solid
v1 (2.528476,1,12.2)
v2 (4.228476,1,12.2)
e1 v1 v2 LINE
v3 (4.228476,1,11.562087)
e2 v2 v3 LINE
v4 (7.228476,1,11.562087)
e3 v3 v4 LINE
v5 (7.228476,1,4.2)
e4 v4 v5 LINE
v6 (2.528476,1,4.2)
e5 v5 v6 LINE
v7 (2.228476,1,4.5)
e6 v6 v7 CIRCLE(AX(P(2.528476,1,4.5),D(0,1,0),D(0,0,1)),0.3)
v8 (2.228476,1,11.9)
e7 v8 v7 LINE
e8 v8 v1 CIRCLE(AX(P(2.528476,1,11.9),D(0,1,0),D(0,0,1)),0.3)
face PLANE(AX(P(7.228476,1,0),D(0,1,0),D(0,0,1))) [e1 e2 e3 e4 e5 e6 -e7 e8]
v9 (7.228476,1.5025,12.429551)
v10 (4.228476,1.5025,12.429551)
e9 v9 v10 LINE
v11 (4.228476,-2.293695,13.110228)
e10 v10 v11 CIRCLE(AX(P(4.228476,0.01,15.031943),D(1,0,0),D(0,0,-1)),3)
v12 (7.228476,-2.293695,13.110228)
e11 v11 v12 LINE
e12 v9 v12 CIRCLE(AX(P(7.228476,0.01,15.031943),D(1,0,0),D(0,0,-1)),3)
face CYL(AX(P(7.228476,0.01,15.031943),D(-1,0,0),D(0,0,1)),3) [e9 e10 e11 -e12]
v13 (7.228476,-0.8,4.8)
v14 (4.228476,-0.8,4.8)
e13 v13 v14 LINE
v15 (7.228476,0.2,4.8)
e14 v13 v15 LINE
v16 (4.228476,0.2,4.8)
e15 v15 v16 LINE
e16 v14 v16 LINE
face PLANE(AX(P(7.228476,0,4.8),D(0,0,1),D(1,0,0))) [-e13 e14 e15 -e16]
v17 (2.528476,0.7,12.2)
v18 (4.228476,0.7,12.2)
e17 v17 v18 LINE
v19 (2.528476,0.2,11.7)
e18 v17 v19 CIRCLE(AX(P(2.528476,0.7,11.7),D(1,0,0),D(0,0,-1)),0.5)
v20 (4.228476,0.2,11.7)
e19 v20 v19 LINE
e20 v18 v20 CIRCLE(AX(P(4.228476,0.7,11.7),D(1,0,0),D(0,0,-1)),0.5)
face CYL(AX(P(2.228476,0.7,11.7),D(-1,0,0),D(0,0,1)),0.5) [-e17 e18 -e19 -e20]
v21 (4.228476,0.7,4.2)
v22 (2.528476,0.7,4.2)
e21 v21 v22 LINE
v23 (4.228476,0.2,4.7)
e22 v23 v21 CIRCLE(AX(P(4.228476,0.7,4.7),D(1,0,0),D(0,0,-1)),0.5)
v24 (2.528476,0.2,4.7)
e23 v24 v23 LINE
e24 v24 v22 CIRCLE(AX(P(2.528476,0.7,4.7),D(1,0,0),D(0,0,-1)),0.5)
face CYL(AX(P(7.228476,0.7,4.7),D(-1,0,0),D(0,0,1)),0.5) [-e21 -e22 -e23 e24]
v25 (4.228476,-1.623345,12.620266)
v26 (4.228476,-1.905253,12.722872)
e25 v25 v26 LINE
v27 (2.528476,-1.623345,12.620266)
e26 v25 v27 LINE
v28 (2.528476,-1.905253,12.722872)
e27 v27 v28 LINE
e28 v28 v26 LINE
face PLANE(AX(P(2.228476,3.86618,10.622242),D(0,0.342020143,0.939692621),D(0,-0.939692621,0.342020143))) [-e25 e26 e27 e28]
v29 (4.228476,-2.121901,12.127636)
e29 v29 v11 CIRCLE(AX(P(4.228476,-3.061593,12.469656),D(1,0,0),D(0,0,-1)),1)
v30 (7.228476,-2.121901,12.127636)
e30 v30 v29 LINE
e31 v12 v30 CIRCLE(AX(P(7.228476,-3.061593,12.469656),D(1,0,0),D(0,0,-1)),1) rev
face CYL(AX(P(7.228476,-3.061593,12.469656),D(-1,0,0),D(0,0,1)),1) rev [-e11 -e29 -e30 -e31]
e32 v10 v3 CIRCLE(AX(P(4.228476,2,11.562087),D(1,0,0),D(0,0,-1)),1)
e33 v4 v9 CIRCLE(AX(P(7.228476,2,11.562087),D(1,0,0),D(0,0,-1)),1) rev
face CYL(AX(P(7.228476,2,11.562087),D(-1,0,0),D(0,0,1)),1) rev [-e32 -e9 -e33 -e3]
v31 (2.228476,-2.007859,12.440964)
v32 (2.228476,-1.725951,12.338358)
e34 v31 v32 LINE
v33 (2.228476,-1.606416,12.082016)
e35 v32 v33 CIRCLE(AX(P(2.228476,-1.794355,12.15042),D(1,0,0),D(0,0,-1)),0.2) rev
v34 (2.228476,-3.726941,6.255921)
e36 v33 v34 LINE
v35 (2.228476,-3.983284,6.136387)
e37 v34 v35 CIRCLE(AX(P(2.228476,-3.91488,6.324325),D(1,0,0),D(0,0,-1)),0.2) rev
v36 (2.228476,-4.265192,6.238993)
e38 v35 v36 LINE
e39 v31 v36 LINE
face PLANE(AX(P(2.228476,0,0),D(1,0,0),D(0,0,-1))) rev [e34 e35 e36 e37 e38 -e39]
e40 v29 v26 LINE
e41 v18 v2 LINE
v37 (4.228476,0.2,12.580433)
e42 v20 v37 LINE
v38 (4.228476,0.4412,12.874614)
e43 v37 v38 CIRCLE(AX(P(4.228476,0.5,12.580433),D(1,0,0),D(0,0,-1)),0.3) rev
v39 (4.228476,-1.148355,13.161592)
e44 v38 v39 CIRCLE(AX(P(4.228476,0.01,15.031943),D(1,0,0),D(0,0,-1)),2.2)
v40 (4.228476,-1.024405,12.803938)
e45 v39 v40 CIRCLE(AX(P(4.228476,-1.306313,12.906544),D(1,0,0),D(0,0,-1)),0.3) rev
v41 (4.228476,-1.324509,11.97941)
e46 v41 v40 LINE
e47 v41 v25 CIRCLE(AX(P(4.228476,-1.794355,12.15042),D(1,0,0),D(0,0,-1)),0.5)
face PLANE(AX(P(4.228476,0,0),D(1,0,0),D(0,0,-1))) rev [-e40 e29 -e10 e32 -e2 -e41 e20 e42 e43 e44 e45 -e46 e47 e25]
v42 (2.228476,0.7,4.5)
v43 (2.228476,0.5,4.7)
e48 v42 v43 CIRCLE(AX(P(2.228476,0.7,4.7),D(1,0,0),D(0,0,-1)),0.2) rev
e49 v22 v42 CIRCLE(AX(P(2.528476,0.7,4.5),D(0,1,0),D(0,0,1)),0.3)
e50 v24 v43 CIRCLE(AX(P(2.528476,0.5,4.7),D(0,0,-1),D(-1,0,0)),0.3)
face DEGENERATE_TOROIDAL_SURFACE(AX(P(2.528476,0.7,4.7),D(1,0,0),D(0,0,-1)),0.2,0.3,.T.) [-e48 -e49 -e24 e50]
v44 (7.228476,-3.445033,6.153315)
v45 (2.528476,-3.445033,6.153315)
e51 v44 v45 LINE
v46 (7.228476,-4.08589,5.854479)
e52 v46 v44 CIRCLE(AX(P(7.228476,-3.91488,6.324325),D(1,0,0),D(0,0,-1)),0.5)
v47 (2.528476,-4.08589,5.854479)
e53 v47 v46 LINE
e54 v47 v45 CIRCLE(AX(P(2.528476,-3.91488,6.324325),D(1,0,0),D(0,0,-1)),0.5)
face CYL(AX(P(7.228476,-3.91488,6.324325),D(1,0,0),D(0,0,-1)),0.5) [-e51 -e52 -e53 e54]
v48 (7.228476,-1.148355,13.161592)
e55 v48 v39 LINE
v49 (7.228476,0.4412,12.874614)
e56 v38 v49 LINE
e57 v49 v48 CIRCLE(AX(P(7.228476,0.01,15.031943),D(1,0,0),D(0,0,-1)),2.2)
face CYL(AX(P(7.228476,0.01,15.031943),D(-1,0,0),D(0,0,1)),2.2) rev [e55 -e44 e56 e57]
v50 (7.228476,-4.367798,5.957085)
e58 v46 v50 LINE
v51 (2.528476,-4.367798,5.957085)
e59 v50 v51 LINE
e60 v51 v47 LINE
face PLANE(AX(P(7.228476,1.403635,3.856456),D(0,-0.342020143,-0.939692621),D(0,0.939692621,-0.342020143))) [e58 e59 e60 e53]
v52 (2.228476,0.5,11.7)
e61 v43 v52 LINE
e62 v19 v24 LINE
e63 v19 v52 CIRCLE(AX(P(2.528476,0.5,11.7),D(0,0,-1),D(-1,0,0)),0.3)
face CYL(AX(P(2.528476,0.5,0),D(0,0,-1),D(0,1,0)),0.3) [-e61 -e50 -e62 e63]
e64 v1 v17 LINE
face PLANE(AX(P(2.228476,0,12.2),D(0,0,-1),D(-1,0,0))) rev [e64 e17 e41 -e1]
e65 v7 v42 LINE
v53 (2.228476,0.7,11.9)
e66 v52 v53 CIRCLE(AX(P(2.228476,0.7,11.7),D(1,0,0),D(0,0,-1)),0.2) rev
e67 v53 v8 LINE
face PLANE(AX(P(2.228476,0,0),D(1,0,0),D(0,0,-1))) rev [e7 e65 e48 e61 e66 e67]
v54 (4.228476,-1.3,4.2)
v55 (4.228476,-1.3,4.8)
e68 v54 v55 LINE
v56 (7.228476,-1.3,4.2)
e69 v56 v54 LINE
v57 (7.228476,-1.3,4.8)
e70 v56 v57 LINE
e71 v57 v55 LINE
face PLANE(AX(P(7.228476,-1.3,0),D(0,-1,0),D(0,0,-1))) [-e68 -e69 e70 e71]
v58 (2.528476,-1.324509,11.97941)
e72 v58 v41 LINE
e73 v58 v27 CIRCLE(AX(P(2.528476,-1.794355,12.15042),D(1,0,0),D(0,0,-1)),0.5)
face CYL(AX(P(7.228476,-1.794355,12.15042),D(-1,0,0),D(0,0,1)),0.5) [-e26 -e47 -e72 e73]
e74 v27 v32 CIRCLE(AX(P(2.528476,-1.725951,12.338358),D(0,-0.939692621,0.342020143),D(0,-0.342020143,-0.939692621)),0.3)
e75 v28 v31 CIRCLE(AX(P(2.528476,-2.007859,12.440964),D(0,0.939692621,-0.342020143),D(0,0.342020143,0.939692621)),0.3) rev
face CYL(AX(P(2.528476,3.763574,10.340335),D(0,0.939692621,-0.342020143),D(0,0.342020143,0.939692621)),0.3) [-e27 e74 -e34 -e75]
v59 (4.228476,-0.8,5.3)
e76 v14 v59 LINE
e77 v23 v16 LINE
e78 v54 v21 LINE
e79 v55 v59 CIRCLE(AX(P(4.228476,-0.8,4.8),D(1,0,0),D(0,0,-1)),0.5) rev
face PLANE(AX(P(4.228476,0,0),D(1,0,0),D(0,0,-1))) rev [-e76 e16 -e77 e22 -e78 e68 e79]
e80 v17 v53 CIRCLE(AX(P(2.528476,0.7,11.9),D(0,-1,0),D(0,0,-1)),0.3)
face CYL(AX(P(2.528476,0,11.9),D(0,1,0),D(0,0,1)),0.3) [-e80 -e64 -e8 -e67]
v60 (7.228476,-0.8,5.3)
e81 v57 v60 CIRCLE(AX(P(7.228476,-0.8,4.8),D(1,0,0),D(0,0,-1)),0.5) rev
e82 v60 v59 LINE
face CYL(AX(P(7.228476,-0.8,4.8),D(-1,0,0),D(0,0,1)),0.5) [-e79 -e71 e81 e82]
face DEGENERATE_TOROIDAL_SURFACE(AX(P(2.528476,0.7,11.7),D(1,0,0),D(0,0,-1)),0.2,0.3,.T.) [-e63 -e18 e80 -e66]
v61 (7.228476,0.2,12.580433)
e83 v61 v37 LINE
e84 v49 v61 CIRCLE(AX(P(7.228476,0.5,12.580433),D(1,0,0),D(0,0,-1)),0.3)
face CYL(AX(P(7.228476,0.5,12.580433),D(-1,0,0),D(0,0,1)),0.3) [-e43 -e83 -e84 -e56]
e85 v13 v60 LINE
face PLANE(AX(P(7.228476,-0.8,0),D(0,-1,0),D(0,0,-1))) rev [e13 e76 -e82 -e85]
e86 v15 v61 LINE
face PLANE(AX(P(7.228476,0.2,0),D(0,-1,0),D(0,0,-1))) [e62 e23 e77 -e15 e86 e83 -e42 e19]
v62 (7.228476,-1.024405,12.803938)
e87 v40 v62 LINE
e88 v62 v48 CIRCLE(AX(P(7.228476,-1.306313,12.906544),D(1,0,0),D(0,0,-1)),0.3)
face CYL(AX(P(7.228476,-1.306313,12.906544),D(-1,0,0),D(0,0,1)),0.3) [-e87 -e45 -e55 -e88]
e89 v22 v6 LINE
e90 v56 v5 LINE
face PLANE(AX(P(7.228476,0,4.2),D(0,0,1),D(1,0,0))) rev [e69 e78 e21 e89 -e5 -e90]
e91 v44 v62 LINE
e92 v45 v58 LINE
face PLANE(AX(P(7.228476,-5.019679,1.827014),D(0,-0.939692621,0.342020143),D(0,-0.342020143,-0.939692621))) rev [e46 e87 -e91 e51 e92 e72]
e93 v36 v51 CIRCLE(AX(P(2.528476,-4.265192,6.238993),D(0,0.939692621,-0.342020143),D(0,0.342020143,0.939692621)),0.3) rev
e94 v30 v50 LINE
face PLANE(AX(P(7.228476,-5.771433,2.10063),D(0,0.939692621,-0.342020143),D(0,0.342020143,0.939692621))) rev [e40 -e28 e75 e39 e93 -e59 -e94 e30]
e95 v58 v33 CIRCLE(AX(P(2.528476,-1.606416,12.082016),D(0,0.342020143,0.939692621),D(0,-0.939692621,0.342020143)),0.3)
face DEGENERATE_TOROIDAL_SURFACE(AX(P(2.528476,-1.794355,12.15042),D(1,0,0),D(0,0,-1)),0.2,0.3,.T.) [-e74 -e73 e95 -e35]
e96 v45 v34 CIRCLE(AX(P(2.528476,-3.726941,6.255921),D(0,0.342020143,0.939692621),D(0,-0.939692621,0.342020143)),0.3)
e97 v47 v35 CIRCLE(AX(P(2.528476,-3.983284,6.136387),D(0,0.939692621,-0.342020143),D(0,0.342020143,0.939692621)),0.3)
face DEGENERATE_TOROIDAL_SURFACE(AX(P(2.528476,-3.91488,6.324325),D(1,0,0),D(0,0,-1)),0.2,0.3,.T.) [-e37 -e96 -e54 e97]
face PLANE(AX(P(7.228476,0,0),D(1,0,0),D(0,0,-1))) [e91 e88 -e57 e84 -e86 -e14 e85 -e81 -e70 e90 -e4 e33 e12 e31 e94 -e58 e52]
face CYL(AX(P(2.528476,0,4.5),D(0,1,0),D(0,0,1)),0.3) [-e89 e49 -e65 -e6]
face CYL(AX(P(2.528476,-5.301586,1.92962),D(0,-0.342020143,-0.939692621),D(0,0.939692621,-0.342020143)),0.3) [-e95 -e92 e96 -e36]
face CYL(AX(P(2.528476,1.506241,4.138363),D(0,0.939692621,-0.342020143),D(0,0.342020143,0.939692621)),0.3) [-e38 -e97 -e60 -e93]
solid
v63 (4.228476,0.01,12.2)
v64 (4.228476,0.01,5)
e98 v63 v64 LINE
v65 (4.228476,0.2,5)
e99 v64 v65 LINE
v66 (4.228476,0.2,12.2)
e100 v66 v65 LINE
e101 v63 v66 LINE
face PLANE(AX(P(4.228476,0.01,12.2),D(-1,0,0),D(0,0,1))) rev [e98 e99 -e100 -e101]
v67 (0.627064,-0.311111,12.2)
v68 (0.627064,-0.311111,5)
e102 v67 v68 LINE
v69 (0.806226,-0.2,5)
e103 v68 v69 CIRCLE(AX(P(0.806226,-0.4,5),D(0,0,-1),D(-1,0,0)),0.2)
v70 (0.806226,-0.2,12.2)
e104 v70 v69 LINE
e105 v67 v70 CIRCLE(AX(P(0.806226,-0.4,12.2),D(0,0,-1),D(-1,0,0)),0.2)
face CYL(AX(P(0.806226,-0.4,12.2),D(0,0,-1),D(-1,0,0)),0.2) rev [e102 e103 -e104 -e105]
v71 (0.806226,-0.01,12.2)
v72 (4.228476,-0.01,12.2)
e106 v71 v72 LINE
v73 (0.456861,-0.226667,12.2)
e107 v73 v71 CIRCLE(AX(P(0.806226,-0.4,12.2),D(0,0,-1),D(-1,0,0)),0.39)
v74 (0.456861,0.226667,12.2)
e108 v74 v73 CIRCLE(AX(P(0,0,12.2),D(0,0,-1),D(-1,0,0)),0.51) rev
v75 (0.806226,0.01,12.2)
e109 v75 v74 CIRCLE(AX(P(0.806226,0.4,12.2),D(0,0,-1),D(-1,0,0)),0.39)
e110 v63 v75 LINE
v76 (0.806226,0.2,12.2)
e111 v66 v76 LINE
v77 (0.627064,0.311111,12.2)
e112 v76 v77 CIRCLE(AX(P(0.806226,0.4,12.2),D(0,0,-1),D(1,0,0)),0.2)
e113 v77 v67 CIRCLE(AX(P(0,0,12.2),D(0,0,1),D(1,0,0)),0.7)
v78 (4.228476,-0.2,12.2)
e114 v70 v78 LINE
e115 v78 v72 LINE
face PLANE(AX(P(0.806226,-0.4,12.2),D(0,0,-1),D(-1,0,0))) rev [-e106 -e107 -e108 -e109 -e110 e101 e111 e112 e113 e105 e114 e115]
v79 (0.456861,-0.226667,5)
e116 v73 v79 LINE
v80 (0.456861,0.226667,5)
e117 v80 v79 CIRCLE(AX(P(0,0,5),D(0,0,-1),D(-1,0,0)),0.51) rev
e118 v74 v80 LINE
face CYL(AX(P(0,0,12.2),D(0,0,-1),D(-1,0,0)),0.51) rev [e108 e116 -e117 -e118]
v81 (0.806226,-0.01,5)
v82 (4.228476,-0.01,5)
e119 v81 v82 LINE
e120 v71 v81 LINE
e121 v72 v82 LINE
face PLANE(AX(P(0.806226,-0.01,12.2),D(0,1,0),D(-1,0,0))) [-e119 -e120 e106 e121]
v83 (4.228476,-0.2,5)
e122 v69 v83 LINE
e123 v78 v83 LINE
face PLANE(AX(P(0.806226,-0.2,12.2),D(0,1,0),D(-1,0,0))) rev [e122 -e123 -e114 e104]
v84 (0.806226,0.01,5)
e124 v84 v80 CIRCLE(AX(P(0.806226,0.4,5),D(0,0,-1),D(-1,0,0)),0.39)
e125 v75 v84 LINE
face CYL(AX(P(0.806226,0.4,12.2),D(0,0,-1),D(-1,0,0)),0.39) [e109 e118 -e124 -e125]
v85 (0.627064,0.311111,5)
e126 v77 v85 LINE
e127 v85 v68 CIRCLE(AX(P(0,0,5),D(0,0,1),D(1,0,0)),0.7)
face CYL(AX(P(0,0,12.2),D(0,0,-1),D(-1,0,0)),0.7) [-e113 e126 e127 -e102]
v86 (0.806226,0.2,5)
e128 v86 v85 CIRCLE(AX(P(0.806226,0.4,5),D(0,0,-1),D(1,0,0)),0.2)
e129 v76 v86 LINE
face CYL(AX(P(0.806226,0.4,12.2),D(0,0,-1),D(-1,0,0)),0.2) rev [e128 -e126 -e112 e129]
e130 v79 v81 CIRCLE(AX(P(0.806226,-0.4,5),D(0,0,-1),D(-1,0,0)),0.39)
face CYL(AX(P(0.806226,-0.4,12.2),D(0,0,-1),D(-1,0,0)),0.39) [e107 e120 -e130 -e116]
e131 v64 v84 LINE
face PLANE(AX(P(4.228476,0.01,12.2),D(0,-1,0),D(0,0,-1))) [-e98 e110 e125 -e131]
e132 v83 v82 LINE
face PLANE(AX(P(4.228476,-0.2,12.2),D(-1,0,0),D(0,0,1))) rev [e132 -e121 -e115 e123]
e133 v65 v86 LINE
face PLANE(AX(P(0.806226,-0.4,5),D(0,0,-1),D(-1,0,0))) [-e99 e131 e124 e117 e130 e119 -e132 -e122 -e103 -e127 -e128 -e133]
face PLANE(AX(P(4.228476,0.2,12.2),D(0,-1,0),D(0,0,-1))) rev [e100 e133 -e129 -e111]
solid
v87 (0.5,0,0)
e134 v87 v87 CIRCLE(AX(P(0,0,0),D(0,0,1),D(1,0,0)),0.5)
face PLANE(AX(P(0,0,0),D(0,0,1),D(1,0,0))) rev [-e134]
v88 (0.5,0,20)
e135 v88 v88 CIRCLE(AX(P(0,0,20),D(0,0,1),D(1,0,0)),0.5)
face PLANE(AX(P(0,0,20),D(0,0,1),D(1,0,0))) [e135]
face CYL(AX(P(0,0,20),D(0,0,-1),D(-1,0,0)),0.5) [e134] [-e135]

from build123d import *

# Parameters (mm, degrees)
SKETCH1_R           = 0.5
BOSS_EXTRUDE1_DEPTH = 20
EXTRUDE_THIN1_DEPTH = 7.2
BOSS_EXTRUDE2_DEPTH = 3
BOSS_EXTRUDE3_DEPTH = 2
FILLET2_R           = 0.5
FILLET3_R           = 1
FILLET4_R           = 0.3
FILLET5_R           = 0.3


with BuildPart() as part:
    # Sketch1 → Boss-Extrude1 (new body)
    with BuildSketch(Plane.XY):
        Circle(SKETCH1_R)
    extrude(amount=BOSS_EXTRUDE1_DEPTH)


with BuildPart() as body_2:
    # Sketch3 → Extrude-Thin1 (new body)
    with BuildSketch(Plane(origin=(0, 0, 5), x_dir=(-1, 0, 0), z_dir=(0, 0, -1))):
        with BuildLine():
            Line((-4.228476287639893, 0.19999999999999948), (-0.8062257748298554, 0.19999999999999948))
            ThreePointArc((-0.8062257748298554, 0.19999999999999948), (-0.7008165194909093, 0.23003268288024017), (-0.6270644915343319, 0.31111111111111067))
            ThreePointArc((-0.6270644915343319, 0.31111111111111067), (0.7000000000000001, 2e-17), (-0.6270644915343316, -0.31111111111111117))
            ThreePointArc((-0.6270644915343316, -0.31111111111111117), (-0.7008165194909091, -0.23003268288024095), (-0.806225774829855, -0.2000000000000001))
            Line((-0.806225774829855, -0.2000000000000001), (-4.228476287639893, -0.2000000000000005))
            Line((-4.228476287639893, -0.2000000000000005), (-4.228476287639893, -0.01000000000000051))
            Line((-4.228476287639893, -0.01000000000000051), (-0.806225774829855, -0.01000000000000009))
            ThreePointArc((-0.8062257748298561, -0.00999999999999929), (-0.6006777269189111, -0.068563731616469), (-0.4568612724035847, -0.22666666666666638))
            ThreePointArc((-0.4568612724035845, -0.22666666666666677), (0.51, -2e-17), (-0.45686127240358465, 0.22666666666666627))
            ThreePointArc((-0.4568612724035848, 0.22666666666666602), (-0.600677726918911, 0.0685637316164685), (-0.8062257748298558, 0.00999999999999912))
            Line((-0.8062257748298554, 0.00999999999999948), (-4.228476287639893, 0.00999999999999948))
            Line((-4.228476287639893, 0.00999999999999948), (-4.228476287639893, 0.19999999999999948))
        make_face()
    extrude(amount=-EXTRUDE_THIN1_DEPTH)


with BuildPart() as body_3:
    # Sketch5 → Boss-Extrude2 (new body)
    with BuildSketch(Plane(origin=(4.228476287639893, 0, 0), x_dir=(0, 0, -1), z_dir=(1, 0, 0))):
        with BuildLine():
            ThreePointArc((-5.300000000000001, -0.8000000000000005), (-5.153553390593275, -1.1535533905932744), (-4.800000000000001, -1.300000000000001))
            Line((-4.800000000000001, -1.3000000000000007), (-4.2, -1.3000000000000007))
            Line((-4.2, -1.3000000000000007), (-4.2, 1))
            Line((-4.2, 0.9999999999999998), (-12.199999999999998, 0.9999999999999987))
            ThreePointArc((-12.2, 0.9999999999999983), (-17.984505771338654, 0.5413867488476434), (-12.72287206983638, -1.9052525633514834))
            Line((-12.722872069836379, -1.9052525633514832), (-5.957085200177842, -4.367797595296302))
            Line((-5.957085200177842, -4.367797595296302), (-5.683469085517308, -3.6160434986675747))
            Line((-5.683469085517308, -3.6160434986675747), (-13.045883095395867, -0.9363439467272978))
            ThreePointArc((-13.045883095395869, -0.9363439467272983), (-17.196753581769194, 0.4019110383209302), (-12.84016269757365, 0.19999999999999932))
            Line((-12.840162697573648, 0.1999999999999994), (-4.800000000000001, 0.19999999999999948))
            Line((-4.800000000000001, 0.1999999999999995), (-4.800000000000001, -0.8000000000000004))
            Line((-4.800000000000001, -0.8000000000000004), (-5.300000000000001, -0.8000000000000004))
        make_face()
    extrude(amount=BOSS_EXTRUDE2_DEPTH)

    # Sketch5<3> → Boss-Extrude3 (add)
    with BuildSketch(Plane(origin=(4.228476287639893, 0, 0), x_dir=(0, 0, -1), z_dir=(1, 0, 0))):
        Polygon((-4.2, 0.19999999999999948), (-4.2, 0.9999999999999996), (-12.199999999999998, 0.9999999999999987), (-12.2, 0.19999999999999948), align=None)
        Polygon((-12.449255955175843, -1.153498466722756), (-12.722872069836379, -1.9052525633514832), (-5.957085200177842, -4.367797595296302), (-5.683469085517308, -3.6160434986675747), align=None)
    extrude(amount=-BOSS_EXTRUDE3_DEPTH)

    # Fillet2
    fillet2_edges = [body_3.edges().sort_by_distance(p)[0] for p in [
        (4.728476287639893, -3.6160434986675747, 5.683469085517308),
        (3.228476287639893, 0.19999999999999948, 4.2),
        (3.228476287639893, 0.19999999999999948, 12.2),
        (3.228476287639893, -1.153498466722756, 12.449255955175843),
    ]]
    fillet(fillet2_edges, radius=FILLET2_R)

    # Fillet3
    fillet3_edges = [body_3.edges().sort_by_distance(p)[0] for p in [
        (5.728476287639893, 0.9999999999999987, 12.2),
        (5.728476287639893, -1.9052525633514845, 12.72287206983638),
    ]]
    fillet(fillet3_edges, radius=FILLET3_R)

    # Fillet4
    fillet4_edges = [body_3.edges().sort_by_distance(p)[0] for p in [
        (2.228476287639893, 0.8499999999999994, 4.2),
        (2.228476287639893, 0.34644660940672556, 4.346446609406727),
        (2.228476287639893, 0.849999999999999, 12.2),
        (2.228476287639893, 0.3464466094067255, 12.053553390593272),
        (2.228476287639893, -1.764298670233596, 12.671569048337528),
        (2.228476287639893, -1.3412009552602184, 12.361728847316073),
        (2.228476287639893, -4.2268437021784155, 5.905782178678991),
        (2.228476287639893, -3.7035706065273453, 5.87117157405477),
        (2.228476287639893, 0.19999999999999948, 8.2),
        (2.228476287639893, -2.3847709826951657, 9.066362520346575),
    ]]
    fillet(fillet4_edges, radius=FILLET4_R)

    # Fillet5
    fillet5_edges = [body_3.edges().sort_by_distance(p)[0] for p in [
        (5.728476287639893, -0.9363439467272981, 13.045883095395869),
        (5.728476287639893, 0.19999999999999957, 12.84016269757365),
    ]]
    fillet(fillet5_edges, radius=FILLET5_R)


solid = Compound([part.part, body_2.part, body_3.part])
